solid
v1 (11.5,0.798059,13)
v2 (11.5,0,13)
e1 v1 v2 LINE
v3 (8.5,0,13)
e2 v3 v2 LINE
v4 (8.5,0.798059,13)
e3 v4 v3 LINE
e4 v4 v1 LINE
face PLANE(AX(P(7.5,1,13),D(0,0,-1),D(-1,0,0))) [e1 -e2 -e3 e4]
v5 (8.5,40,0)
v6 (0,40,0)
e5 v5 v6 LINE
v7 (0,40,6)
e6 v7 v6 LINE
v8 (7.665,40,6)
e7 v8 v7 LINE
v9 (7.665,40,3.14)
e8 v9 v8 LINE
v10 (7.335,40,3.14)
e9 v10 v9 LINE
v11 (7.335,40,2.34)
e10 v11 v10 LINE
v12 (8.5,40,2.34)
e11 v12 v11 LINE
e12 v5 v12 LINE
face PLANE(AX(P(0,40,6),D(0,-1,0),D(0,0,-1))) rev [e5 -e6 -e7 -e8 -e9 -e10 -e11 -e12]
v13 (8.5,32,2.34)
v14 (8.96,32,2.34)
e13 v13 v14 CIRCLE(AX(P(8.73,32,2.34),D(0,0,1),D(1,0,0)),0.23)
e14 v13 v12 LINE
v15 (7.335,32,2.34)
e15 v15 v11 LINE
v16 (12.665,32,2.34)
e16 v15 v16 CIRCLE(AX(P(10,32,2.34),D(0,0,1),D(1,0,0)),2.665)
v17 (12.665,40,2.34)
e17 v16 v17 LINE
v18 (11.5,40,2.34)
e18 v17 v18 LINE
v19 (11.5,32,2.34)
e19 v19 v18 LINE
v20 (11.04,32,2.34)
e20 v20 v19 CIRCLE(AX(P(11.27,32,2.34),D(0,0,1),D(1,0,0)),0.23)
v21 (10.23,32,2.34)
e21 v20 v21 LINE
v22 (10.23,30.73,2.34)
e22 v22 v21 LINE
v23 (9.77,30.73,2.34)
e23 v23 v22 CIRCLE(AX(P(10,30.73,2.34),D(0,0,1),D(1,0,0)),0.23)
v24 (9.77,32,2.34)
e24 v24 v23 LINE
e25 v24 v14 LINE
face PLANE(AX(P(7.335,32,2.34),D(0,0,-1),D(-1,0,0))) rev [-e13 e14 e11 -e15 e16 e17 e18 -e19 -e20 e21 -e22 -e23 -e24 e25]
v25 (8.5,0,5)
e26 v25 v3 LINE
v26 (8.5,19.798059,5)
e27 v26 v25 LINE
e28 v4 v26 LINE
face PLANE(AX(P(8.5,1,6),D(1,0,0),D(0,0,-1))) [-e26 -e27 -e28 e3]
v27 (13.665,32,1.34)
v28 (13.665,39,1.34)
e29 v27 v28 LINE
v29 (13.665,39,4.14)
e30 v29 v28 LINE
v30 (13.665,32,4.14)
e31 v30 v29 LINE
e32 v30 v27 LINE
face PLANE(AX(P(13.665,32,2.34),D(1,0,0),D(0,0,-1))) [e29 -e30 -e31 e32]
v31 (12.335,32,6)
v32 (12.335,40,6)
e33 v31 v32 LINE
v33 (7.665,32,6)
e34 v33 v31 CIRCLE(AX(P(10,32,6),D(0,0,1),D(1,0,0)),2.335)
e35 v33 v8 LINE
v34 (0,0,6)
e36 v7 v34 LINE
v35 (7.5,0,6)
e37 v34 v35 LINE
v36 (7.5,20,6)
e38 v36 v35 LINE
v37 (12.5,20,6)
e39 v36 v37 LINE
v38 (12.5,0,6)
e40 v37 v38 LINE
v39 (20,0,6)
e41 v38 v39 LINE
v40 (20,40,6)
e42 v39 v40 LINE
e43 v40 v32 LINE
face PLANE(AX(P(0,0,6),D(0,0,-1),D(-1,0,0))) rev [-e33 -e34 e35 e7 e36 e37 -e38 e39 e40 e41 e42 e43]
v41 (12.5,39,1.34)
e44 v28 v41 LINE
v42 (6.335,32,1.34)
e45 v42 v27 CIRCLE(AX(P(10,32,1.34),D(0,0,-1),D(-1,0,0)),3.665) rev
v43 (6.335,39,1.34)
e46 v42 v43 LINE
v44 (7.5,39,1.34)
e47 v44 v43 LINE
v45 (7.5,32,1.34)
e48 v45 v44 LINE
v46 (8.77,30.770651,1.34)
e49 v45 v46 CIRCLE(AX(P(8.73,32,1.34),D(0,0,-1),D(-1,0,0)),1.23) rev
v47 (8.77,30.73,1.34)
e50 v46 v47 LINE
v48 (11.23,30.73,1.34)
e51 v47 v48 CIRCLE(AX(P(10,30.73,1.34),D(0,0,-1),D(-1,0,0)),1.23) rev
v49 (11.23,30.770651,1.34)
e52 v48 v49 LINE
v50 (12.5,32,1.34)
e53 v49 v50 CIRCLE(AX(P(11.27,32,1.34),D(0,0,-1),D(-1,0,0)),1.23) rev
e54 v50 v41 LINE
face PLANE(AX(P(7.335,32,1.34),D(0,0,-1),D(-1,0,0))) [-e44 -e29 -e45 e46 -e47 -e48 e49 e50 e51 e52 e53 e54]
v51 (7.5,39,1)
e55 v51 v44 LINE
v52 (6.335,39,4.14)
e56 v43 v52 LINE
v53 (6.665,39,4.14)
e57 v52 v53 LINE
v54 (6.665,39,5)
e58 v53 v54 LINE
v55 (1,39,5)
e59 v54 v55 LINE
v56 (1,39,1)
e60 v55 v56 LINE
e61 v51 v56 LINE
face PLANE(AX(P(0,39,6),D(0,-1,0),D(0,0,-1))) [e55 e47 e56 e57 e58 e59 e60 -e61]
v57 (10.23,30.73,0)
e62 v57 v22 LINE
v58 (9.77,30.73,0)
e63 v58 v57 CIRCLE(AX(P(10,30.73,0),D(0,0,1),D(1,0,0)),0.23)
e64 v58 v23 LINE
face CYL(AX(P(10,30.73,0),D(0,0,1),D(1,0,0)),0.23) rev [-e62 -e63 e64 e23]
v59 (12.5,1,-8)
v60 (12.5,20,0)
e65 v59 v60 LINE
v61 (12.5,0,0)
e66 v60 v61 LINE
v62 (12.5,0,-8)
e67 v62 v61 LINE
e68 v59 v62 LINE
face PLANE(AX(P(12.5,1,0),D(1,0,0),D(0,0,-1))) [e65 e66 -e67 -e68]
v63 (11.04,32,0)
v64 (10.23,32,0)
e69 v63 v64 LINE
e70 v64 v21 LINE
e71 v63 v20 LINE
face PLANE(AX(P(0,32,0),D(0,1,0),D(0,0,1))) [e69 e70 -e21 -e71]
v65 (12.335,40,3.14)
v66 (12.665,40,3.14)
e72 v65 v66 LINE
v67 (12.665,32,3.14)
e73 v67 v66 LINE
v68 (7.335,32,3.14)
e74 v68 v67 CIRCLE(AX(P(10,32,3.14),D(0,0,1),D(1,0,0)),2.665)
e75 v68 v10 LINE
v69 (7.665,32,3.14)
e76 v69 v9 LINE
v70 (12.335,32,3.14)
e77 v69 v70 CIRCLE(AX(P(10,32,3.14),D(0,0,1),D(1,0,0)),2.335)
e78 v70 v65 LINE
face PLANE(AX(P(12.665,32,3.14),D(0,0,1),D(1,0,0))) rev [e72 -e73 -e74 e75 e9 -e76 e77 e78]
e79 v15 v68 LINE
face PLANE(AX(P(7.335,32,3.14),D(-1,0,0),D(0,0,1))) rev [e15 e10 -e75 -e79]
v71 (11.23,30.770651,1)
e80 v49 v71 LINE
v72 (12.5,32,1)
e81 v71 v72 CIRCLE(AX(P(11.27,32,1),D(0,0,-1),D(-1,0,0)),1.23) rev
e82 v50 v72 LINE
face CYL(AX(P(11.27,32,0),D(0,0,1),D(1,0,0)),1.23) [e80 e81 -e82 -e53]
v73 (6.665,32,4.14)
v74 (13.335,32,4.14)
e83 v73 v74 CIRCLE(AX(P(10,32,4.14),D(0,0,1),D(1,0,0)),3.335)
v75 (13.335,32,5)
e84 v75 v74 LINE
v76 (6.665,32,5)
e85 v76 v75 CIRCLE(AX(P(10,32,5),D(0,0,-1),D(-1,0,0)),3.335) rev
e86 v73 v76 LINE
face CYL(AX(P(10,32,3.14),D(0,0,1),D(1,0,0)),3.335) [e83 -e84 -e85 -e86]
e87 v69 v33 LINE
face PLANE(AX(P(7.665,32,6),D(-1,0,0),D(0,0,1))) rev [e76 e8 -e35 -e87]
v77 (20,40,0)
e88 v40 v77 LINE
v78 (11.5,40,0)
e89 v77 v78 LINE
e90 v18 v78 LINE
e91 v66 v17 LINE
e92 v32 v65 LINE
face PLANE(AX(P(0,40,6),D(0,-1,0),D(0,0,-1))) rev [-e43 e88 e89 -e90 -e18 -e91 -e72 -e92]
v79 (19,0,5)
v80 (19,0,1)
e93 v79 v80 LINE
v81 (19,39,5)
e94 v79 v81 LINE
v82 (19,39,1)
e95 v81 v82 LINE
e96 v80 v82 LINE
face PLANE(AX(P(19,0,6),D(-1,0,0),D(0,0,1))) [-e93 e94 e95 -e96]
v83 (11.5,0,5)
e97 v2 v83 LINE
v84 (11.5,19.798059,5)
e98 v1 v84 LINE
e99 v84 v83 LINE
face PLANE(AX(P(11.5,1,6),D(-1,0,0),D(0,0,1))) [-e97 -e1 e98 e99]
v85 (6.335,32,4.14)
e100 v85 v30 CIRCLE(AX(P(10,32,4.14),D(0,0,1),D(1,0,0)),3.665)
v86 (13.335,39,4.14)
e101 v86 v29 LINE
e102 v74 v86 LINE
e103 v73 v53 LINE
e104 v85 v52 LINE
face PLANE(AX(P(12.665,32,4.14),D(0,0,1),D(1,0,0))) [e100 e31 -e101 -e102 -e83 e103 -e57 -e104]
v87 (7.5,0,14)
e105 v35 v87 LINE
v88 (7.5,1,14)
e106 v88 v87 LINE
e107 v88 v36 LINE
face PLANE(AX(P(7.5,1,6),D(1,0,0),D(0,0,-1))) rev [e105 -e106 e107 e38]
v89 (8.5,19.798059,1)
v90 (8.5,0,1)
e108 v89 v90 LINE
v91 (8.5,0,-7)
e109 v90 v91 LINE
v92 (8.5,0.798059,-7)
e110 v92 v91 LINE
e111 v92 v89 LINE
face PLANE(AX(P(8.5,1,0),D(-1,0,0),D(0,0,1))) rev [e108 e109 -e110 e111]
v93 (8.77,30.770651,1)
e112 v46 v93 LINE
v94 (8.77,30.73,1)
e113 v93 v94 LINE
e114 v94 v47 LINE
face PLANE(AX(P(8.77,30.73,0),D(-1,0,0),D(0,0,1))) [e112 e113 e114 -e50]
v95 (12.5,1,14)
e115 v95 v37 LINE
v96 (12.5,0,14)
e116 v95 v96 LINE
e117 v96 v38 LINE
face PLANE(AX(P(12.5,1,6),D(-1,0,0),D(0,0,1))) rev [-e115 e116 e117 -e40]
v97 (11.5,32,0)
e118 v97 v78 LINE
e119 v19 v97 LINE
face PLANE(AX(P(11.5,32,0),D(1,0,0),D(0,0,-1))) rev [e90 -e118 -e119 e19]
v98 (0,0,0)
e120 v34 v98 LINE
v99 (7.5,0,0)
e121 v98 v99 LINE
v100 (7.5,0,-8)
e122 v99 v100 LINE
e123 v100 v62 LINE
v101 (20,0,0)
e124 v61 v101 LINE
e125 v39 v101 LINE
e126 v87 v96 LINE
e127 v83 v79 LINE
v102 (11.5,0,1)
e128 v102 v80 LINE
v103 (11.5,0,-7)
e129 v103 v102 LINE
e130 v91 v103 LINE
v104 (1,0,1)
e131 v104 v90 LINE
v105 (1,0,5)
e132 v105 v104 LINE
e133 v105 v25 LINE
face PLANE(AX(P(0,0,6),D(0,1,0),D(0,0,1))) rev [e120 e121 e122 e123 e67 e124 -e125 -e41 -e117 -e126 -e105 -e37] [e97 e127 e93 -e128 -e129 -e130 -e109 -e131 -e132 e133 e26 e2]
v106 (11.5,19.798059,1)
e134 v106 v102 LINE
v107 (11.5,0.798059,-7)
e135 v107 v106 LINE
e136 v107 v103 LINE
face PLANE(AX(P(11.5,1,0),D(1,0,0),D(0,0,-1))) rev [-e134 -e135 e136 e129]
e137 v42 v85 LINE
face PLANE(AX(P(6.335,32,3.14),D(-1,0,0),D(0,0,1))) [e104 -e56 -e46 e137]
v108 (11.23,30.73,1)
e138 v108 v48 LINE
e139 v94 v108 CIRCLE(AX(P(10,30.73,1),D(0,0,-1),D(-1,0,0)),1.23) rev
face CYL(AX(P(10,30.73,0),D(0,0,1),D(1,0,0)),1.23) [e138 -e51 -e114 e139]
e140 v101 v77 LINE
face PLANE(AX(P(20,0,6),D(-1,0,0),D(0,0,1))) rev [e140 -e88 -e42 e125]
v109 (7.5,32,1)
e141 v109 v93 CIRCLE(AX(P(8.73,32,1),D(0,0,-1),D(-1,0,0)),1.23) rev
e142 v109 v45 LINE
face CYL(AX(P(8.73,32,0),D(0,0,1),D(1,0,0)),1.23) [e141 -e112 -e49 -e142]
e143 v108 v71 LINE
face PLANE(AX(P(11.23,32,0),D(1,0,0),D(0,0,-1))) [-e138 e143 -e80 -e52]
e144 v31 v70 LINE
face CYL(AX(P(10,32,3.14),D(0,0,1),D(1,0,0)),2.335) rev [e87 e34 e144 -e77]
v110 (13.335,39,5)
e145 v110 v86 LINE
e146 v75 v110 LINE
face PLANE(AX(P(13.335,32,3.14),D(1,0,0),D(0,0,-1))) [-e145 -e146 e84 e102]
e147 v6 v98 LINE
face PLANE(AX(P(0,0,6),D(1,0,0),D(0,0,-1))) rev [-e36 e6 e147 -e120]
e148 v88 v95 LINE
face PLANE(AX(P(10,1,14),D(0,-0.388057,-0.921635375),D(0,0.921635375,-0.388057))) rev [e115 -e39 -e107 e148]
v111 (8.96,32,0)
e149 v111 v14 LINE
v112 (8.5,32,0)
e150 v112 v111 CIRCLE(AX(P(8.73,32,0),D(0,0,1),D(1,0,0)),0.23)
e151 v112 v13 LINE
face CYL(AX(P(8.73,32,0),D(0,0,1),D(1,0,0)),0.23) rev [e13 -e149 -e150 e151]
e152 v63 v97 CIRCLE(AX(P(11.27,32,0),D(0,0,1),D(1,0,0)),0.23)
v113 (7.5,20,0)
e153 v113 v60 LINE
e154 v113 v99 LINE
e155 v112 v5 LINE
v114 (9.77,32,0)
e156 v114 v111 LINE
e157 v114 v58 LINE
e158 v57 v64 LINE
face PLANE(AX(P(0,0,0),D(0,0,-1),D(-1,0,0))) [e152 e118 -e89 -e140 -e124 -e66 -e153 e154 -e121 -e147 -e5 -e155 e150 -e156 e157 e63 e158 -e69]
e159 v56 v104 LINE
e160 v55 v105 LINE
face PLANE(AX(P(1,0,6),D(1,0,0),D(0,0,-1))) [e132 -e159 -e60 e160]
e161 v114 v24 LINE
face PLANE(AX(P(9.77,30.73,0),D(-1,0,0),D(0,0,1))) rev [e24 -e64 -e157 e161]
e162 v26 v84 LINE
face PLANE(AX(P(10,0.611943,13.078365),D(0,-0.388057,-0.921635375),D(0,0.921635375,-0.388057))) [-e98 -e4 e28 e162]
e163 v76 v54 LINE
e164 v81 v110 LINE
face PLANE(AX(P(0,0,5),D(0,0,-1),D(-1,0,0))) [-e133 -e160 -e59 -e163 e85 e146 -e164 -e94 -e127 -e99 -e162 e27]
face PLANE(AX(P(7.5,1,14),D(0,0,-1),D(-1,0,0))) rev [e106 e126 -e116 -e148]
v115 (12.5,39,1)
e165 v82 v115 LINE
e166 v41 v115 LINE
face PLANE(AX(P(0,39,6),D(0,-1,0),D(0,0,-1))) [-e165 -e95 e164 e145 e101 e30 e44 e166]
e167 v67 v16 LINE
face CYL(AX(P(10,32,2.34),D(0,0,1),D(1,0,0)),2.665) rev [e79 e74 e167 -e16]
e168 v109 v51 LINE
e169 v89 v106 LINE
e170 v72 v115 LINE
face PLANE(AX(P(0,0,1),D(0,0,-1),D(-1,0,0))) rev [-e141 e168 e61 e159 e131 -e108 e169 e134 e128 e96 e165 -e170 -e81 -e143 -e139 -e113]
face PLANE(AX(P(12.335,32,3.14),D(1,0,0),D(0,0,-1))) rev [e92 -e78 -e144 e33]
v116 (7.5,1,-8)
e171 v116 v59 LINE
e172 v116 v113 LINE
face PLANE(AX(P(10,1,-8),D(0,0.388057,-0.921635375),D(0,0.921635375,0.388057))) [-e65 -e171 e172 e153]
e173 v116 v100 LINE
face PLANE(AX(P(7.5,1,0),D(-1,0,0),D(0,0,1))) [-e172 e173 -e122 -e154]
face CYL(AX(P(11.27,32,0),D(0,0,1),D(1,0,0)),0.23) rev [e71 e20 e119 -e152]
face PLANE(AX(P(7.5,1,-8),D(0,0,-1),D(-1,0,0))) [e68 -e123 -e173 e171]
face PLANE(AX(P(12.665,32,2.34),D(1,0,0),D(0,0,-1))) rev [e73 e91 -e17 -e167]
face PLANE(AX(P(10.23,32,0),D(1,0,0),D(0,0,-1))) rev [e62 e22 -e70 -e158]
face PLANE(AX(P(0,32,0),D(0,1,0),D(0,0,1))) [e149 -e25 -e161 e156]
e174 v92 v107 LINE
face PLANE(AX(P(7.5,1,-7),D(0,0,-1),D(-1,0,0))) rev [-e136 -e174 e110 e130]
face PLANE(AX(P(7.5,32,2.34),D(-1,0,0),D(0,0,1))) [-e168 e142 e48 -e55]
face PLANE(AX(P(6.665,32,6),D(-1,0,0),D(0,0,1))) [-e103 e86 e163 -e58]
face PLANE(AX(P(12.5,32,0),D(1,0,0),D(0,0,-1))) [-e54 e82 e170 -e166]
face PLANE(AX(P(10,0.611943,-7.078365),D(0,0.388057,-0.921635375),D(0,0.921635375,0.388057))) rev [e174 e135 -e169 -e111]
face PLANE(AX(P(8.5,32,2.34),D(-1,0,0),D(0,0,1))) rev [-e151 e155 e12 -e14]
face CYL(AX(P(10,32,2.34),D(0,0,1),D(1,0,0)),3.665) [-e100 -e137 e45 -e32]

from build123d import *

# Parameters (mm, degrees)
SKETCH1_W           = 20
SKETCH1_H           = 40
BOSS_EXTRUDE1_DEPTH = 6
CUT_EXTRUDE1_DEPTH  = 8
CUT_EXTRUDE2_DEPTH  = 2.86
CUT_EXTRUDE3_DEPTH  = 0.8
CUT_EXTRUDE4_DEPTH  = 45.870876969
SKETCH8_W           = 5
SKETCH8_H           = 8
BOSS_EXTRUDE2_DEPTH = 1
RIB2_REACH          = 44
SKETCH9_WALL_W      = 106.615528128
SKETCH9_WALL_H      = 5
SHELL1_START        = 1
SHELL1_DEPTH        = 4
SHELL1_2_DEPTH      = 0.34
SHELL1_START_2      = 4.14
SHELL1_3_DEPTH      = 0.86
SHELL1_START_3      = 8.5
SHELL1_4_DEPTH      = 3


with BuildPart() as part:
    # Sketch1 → Boss-Extrude1 (new body)
    with BuildSketch(Plane.XY):
        with Locations((10, 20)):
            Rectangle(SKETCH1_W, SKETCH1_H)
    extrude(amount=BOSS_EXTRUDE1_DEPTH)

    # Sketch2 → Cut-Extrude1 (cut)
    with BuildSketch(Plane(origin=(0, 40, 0), x_dir=(1, 0, 0), z_dir=(0, 1, 0))):
        Polygon((12.665, -2.34), (12.665, -3.14), (12.335, -3.14), (12.335, -6), (7.665, -6), (7.665, -3.14), (7.335, -3.14), (7.335, -2.34), (8.5, -2.34), (8.5, 0), (11.5, 0), (11.5, -2.34), align=None)
    extrude(amount=-CUT_EXTRUDE1_DEPTH, mode=Mode.SUBTRACT)

    # Sketch3 → Cut-Extrude2 (cut)
    with BuildSketch(Plane.XY.offset(6)):
        with BuildLine():
            Line((7.665, 32), (12.335, 32))
            ThreePointArc((12.335, 32), (10, 29.665), (7.665, 32))
        make_face()
    extrude(amount=-CUT_EXTRUDE2_DEPTH, mode=Mode.SUBTRACT)

    # Sketch5 → Cut-Extrude3 (cut)
    with BuildSketch(Plane.XY.offset(3.14)):
        with BuildLine():
            Line((7.335, 32), (12.665, 32))
            ThreePointArc((12.665, 32), (10, 29.335), (7.335, 32))
        make_face()
    extrude(amount=-CUT_EXTRUDE3_DEPTH, mode=Mode.SUBTRACT)

    # Sketch7 → Cut-Extrude4 (cut, through all)
    with BuildSketch(Plane.XY.offset(2.34)):
        with BuildLine():
            Line((9.77, 30.73), (9.77, 32))
            Line((9.77, 32), (10.23, 32))
            Line((10.23, 32), (10.23, 30.73))
            ThreePointArc((10.23, 30.73), (10, 30.5), (9.77, 30.73))
        make_face()
        with BuildLine():
            Line((8.5, 32), (8.96, 32))
            ThreePointArc((8.96, 32), (8.73, 31.77), (8.5, 32))
        make_face()
        with BuildLine():
            Line((11.04, 32), (11.5, 32))
            ThreePointArc((11.5, 32), (11.27, 31.77), (11.04, 32))
        make_face()
    extrude(amount=-CUT_EXTRUDE4_DEPTH, mode=Mode.SUBTRACT)

    # Sketch8 → Boss-Extrude2 (add)
    with BuildSketch(Plane.XZ):
        with Locations((10, -4)):
            Rectangle(SKETCH8_W, SKETCH8_H)
    boss_extrude2 = extrude(amount=-BOSS_EXTRUDE2_DEPTH)

    # Sketch9 wall → Rib2 (add, up to next)
    with BuildSketch(Plane(origin=(10, 10.5, -4), x_dir=(0, 0.921635375138, 0.388057000058), z_dir=(0, -0.388057000058, 0.921635375138)), mode=Mode.PRIVATE) as rib2_sk1:
        Rectangle(SKETCH9_WALL_W, SKETCH9_WALL_H)
    rib2_tool1 = extrude(rib2_sk1.sketch, amount=RIB2_REACH, mode=Mode.PRIVATE) - part.part
    rib2 = rib2_tool1.solids().sort_by_distance((10, 10.5, -4))[0]
    add(rib2)

    # Mirror1: Boss-Extrude2, Rib2 across plane
    add(boss_extrude2.mirror(Plane.XY.offset(3)))
    add(rib2.mirror(Plane.XY.offset(3)))

    # Shell1: read off the stored shape, not the designer's step
    # Shell1 outline → Shell1 (cut)
    with BuildSketch(Plane.XY.offset(SHELL1_START)):
        with BuildLine():
            Line((6.335, 32), (6.335, 39))
            Line((6.335, 39), (1, 39))
            Line((1, 39), (1, 0))
            Line((1, 0), (8.5, 0))
            Line((8.5, 0), (11.5, 0))
            Line((11.5, 0), (19, 0))
            Line((19, 0), (19, 39))
            Line((19, 39), (13.665, 39))
            Line((13.665, 39), (13.665, 32))
            ThreePointArc((13.665, 32), (10, 28.335), (6.335, 32))
        make_face()
    extrude(amount=SHELL1_DEPTH, mode=Mode.SUBTRACT)

    # Shell1 2 outline → Shell1 2 (cut)
    with BuildSketch(Plane.XY.offset(SHELL1_START)):
        with BuildLine():
            Line((7.5, 32), (7.5, 39))
            Line((7.5, 39), (6.335, 39))
            Line((6.335, 39), (6.335, 32))
            ThreePointArc((6.335, 32), (10, 28.335), (13.665, 32))
            Line((13.665, 32), (13.665, 39))
            Line((13.665, 39), (12.5, 39))
            Line((12.5, 39), (12.5, 32))
            ThreePointArc((12.5, 32), (12.12548232, 31.116229668), (11.23, 30.770650579))
            Line((11.23, 30.770650579), (11.23, 30.73))
            ThreePointArc((11.23, 30.73), (10, 29.5), (8.77, 30.73))
            Line((8.77, 30.73), (8.77, 30.770650579))
            ThreePointArc((8.77, 30.770650579), (7.87451768, 31.116229668), (7.5, 32))
        make_face()
    extrude(amount=SHELL1_2_DEPTH, mode=Mode.SUBTRACT)

    # Shell1 3 outline → Shell1 3 (cut)
    with BuildSketch(Plane.XY.offset(SHELL1_START_2)):
        with BuildLine():
            Line((6.665, 32), (6.665, 39))
            Line((6.665, 39), (6.335, 39))
            Line((6.335, 39), (6.335, 32))
            ThreePointArc((6.335, 32), (10, 28.335), (13.665, 32))
            Line((13.665, 32), (13.665, 39))
            Line((13.665, 39), (13.335, 39))
            Line((13.335, 39), (13.335, 32))
            ThreePointArc((13.335, 32), (10, 28.665), (6.665, 32))
        make_face()
    extrude(amount=SHELL1_3_DEPTH, mode=Mode.SUBTRACT)

    # Shell1 4 outline → Shell1 4 (cut)
    with BuildSketch(Plane.YZ.offset(SHELL1_START_3)):
        Polygon((0, 1), (0, -7), (0.798058984, -7), (19.798058984, 1), align=None)
        Polygon((0, 13), (0, 5), (19.798058984, 5), (0.798058984, 13), align=None)
    extrude(amount=SHELL1_4_DEPTH, mode=Mode.SUBTRACT)


solid = part.part
